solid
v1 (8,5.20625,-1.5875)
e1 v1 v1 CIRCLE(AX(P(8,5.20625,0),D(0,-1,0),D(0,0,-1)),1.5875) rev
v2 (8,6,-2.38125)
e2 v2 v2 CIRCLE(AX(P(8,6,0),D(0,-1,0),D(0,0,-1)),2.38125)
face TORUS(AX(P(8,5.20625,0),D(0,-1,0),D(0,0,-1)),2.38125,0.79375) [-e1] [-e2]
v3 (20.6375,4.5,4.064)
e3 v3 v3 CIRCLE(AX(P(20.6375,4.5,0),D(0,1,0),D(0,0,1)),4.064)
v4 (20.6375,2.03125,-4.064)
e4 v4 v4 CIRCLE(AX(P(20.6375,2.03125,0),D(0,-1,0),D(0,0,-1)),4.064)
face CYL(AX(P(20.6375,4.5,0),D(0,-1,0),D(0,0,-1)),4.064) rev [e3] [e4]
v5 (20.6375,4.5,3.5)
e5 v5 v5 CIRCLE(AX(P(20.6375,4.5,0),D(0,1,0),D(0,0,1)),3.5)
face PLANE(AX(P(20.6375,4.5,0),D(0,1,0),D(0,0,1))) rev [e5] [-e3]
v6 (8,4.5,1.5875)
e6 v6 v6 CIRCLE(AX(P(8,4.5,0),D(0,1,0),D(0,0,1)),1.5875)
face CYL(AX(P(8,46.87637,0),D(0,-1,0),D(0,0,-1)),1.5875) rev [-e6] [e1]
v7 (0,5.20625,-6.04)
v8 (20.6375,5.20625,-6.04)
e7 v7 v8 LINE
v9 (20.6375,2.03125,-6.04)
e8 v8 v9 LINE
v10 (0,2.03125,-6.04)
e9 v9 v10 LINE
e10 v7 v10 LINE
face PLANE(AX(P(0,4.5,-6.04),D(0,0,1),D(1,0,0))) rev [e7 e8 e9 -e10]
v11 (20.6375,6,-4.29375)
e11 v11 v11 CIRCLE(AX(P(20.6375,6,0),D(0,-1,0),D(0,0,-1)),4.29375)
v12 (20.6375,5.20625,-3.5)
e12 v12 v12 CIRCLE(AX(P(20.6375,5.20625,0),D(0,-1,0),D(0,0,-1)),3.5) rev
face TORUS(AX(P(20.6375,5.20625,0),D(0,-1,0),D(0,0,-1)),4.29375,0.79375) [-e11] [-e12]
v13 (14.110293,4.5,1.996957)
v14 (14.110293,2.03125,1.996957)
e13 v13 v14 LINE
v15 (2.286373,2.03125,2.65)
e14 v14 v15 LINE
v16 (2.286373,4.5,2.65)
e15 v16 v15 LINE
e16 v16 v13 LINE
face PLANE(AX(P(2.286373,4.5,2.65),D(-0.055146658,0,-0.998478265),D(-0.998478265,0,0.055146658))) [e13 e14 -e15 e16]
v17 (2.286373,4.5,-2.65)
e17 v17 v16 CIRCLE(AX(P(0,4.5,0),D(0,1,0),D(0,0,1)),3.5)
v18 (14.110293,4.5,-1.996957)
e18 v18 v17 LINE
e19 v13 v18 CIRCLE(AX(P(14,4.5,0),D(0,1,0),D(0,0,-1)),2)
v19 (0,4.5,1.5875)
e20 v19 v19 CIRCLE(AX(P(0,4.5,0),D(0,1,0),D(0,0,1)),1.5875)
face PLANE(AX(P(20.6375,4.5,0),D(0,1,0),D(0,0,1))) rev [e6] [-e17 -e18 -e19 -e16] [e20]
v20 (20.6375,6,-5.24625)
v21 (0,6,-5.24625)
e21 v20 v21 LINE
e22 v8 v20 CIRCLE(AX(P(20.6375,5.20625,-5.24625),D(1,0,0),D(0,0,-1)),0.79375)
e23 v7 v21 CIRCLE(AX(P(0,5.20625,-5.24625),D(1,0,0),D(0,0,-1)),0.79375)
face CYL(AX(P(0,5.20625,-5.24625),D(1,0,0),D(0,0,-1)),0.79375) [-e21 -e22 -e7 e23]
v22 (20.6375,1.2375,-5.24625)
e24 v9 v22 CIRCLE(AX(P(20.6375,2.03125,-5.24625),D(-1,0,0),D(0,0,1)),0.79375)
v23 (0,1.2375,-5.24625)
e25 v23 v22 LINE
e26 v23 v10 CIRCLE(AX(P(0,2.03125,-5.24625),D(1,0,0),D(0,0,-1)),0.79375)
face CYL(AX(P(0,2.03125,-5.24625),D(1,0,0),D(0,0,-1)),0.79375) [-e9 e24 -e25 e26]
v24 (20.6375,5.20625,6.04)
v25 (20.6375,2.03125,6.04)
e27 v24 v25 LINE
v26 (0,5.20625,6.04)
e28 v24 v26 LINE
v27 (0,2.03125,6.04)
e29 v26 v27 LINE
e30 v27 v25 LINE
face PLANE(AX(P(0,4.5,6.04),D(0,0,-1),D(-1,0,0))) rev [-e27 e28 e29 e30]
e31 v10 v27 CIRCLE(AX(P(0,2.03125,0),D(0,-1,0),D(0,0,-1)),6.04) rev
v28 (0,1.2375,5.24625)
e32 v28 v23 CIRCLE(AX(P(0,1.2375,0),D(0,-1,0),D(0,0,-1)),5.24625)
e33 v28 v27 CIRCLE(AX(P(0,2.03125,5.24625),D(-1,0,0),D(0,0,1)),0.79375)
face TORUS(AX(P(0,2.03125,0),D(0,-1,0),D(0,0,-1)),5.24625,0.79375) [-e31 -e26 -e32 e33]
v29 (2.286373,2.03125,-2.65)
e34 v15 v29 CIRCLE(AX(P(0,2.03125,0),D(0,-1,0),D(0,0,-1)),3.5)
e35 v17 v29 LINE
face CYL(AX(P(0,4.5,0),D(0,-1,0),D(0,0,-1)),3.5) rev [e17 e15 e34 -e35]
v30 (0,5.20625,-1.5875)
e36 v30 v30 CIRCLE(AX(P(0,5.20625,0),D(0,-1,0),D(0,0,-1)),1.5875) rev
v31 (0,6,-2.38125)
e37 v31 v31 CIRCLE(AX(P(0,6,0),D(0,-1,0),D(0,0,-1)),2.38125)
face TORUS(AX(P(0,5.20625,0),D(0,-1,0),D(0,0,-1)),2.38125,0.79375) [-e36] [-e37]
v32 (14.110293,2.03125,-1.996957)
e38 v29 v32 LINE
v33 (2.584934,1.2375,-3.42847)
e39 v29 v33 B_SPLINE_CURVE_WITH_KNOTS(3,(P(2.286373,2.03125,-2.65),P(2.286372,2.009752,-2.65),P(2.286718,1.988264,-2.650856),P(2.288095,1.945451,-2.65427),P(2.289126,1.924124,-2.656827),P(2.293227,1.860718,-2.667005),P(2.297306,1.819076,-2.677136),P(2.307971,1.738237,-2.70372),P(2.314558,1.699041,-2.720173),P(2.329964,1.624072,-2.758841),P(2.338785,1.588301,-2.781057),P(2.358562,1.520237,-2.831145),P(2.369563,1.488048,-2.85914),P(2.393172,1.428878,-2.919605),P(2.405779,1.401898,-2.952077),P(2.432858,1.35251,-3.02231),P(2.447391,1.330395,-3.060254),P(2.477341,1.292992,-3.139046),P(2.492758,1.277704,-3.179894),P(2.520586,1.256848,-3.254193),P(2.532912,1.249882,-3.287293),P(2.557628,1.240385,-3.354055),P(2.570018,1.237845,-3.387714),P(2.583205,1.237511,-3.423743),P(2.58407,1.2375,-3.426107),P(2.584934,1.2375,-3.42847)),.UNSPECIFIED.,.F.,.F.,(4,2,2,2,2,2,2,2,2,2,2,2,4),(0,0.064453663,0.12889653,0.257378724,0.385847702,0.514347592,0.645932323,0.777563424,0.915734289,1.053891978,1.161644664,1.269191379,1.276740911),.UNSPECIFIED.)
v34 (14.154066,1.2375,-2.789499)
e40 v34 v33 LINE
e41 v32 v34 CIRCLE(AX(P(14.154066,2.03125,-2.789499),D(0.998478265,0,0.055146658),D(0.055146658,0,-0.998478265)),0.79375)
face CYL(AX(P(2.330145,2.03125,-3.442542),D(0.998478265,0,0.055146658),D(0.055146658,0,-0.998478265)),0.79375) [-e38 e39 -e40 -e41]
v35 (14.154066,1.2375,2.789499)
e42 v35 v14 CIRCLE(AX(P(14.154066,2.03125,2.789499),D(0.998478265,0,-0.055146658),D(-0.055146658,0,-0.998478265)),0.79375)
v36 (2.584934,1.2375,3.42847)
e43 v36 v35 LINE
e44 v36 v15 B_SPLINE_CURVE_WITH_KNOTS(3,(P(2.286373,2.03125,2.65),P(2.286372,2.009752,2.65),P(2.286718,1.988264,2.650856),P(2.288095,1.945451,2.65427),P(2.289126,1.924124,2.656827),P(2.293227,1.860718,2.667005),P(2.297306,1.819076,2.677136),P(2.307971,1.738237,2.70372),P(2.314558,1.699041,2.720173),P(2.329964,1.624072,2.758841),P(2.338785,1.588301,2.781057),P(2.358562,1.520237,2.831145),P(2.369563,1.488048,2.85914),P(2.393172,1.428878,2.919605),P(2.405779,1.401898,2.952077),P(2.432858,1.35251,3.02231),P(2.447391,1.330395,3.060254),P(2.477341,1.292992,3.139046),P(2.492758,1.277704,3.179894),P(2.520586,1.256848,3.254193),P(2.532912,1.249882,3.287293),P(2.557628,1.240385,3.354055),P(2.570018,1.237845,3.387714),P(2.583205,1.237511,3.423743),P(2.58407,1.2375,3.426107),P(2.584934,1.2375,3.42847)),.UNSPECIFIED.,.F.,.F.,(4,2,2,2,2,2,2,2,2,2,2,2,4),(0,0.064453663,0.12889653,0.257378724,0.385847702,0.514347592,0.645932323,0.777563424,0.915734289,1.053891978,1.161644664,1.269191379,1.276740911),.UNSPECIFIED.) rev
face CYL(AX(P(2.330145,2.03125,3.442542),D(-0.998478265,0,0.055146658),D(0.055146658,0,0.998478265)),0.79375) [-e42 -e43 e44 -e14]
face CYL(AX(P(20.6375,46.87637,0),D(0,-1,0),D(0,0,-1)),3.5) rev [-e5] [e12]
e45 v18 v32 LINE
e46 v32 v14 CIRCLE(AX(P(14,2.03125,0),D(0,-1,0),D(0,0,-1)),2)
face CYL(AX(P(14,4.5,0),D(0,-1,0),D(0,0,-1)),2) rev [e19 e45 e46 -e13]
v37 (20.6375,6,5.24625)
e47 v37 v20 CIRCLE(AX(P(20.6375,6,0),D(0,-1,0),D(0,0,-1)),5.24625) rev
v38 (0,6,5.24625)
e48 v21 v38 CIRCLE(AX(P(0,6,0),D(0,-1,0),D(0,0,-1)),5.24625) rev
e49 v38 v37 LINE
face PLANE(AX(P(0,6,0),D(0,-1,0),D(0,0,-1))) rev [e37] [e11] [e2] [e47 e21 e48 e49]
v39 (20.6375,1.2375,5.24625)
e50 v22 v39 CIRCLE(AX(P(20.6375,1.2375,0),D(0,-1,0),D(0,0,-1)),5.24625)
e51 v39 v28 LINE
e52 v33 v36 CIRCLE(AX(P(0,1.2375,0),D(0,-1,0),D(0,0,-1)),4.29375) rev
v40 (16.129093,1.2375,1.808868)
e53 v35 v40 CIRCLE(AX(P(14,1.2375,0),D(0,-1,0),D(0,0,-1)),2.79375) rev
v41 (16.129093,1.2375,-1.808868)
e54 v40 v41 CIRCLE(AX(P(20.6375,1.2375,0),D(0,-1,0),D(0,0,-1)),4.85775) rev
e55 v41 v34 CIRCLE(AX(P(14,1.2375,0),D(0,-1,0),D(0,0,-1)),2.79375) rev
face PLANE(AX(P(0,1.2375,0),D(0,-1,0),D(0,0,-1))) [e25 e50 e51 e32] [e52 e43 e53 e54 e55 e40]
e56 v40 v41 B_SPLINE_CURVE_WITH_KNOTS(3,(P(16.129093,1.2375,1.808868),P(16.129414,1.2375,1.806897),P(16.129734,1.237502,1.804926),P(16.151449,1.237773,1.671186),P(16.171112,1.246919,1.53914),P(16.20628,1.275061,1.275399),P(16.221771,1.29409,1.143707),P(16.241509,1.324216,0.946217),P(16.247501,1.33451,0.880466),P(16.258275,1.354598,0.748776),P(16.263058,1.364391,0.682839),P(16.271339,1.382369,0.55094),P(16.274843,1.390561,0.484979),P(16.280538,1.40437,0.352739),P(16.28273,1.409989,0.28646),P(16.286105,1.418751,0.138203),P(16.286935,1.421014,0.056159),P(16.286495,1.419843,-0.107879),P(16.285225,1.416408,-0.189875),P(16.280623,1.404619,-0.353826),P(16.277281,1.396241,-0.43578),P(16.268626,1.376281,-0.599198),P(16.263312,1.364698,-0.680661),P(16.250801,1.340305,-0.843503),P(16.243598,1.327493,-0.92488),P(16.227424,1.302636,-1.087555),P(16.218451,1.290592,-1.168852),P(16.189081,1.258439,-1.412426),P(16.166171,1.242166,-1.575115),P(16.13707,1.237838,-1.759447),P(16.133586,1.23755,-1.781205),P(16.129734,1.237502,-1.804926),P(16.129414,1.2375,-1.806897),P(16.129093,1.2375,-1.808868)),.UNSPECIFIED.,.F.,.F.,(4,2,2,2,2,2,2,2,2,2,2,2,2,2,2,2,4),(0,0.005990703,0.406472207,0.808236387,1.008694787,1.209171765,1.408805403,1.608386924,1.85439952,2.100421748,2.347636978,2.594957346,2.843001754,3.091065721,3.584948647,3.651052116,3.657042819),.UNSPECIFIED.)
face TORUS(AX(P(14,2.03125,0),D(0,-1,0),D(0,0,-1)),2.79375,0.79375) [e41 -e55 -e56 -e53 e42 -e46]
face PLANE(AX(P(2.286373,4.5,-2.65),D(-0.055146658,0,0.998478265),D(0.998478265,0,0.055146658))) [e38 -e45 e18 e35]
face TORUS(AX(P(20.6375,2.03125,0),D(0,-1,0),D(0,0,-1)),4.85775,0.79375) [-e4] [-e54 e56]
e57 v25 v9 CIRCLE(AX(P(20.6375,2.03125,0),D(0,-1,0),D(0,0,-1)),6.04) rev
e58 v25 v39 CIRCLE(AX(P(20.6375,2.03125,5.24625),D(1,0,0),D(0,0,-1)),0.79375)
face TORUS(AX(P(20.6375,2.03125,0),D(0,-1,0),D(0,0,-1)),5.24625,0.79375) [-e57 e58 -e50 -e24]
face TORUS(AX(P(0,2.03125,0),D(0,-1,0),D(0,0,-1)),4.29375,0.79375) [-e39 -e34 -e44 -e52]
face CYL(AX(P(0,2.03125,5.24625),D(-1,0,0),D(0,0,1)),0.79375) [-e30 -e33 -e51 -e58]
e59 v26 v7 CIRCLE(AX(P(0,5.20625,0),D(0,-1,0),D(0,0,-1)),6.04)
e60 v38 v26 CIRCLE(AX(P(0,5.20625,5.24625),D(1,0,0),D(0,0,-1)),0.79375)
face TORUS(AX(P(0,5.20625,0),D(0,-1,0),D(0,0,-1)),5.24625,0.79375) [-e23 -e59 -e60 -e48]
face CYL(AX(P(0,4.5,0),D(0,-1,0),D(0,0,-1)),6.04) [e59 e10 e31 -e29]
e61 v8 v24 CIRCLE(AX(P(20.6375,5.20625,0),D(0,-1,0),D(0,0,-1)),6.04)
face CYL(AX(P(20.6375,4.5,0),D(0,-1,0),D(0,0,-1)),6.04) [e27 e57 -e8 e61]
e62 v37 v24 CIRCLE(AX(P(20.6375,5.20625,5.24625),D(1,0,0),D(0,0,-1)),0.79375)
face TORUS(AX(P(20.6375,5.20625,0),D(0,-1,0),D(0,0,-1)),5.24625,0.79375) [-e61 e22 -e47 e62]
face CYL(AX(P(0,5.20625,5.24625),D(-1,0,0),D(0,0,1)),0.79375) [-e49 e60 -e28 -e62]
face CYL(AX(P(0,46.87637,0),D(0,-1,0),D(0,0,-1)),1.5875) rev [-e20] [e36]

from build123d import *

# Parameters (mm, degrees)
SKETCH1_R           = 4.064
BOSS_EXTRUDE1_DEPTH = 4.5
SKETCH2_R           = 1.5875
SKETCH2_R_2         = 3.5
BOSS_EXTRUDE2_DEPTH = 1.5
CUT_EXTRUDE1_DEPTH  = 1.2375
FILLET2_R           = 0.79375
FILLET3_R           = 0.79375


with BuildPart() as part:
    # Sketch1 → Boss-Extrude1 (new body)
    with BuildSketch(Plane(origin=(0, 0, 0), x_dir=(1, 0, 0), z_dir=(0, 1, 0))):
        with BuildLine():
            Line((0, 6.04), (20.6375, 6.04))
            ThreePointArc((20.6375, 6.04), (26.6775, 0), (20.6375, -6.04))
            Line((20.6375, -6.04), (0, -6.04))
            ThreePointArc((0, -6.04), (-6.04, 0), (0, 6.04))
        make_face()
        with Locations(Location((20.6375, 0, 0), (0, 0, 270))):
            Circle(SKETCH1_R, mode=Mode.SUBTRACT)
        with BuildLine():
            Line((2.286372673, 2.65), (14.110293316, 1.99695653))
            ThreePointArc((14.110293316, 1.99695653), (16, 0), (14.110293316, -1.99695653))
            Line((14.110293316, -1.99695653), (2.286372673, -2.65))
            ThreePointArc((2.286372673, -2.65), (-3.5, 0), (2.286372673, 2.65))
        make_face(mode=Mode.SUBTRACT)
    extrude(amount=BOSS_EXTRUDE1_DEPTH)

    # Sketch2 → Boss-Extrude2 (add)
    with BuildSketch(Plane(origin=(0, 4.5, 0), x_dir=(1, 0, 0), z_dir=(0, 1, 0))):
        with BuildLine():
            Line((20.6375, 6.04), (0, 6.04))
            ThreePointArc((0, 6.04), (-6.04, 0), (0, -6.04))
            Line((0, -6.04), (20.6375, -6.04))
            ThreePointArc((20.6375, -6.04), (26.6775, 0), (20.6375, 6.04))
        make_face()
        with Locations(Location((0, 0, 0), (0, 0, 90))):
            Circle(SKETCH2_R, mode=Mode.SUBTRACT)
        with Locations(Location((8, 0, 0), (0, 0, 90))):
            Circle(SKETCH2_R, mode=Mode.SUBTRACT)
        with Locations(Location((20.6375, 0, 0), (0, 0, 90))):
            Circle(SKETCH2_R_2, mode=Mode.SUBTRACT)
    extrude(amount=BOSS_EXTRUDE2_DEPTH)

    # Sketch3 → Cut-Extrude1 (cut)
    with BuildSketch(Plane.XZ):
        with BuildLine():
            Line((20.6375, 6.04), (0, 6.04))
            ThreePointArc((0, 6.04), (-6.04, 0), (0, -6.04))
            Line((0, -6.04), (20.6375, -6.04))
            ThreePointArc((20.6375, -6.04), (26.6775, 0), (20.6375, 6.04))
        make_face()
    extrude(amount=-CUT_EXTRUDE1_DEPTH, mode=Mode.SUBTRACT)

    # Fillet2
    # the kernel refuses this fillet: 0.79375 mm, written as the material it takes off along each edge
    with BuildSketch(Plane(origin=(0.305017366, 1.2375, 2.75943165), x_dir=(0.055146658226504934, 0, 0.9984782652048311), z_dir=(0.9984782652048312, 0, -0.055146658226504934)), Plane(origin=(14.110293316, 1.2375, -1.99695653), x_dir=(0.055146658226504934, 0, -0.9984782652048311), z_dir=(-0.9984782652048312, 0, -0.055146658226504934))) as fillet2_piece_1:
        with BuildLine():
            CenterArc((FILLET2_R, -FILLET2_R), FILLET2_R, 90, 90)
            Line((0, -FILLET2_R), (0, 0))
            Line((0, 0), (FILLET2_R, 0))
        make_face()
    extrude(amount=13.826315937, mode=Mode.SUBTRACT)
    with BuildSketch(Plane(origin=(0, 1.2375, 0), x_dir=(0.958233566749164, 0, 0.28598676814701657), z_dir=(0.28598676814701657, 0, -0.958233566749164))) as fillet2_piece_2:
        with BuildLine():
            CenterArc((3.5 + FILLET2_R, -FILLET2_R), FILLET2_R, 90, 90)
            Line((3.5, -FILLET2_R), (3.5, 0))
            Line((3.5, 0), (3.5 + FILLET2_R, 0))
        make_face()
    revolve(axis=Axis((0, 1.2375, 0), (0, -1, 0)), revolution_arc=326.764317032, mode=Mode.SUBTRACT)
    with BuildSketch(Plane(origin=(14, 1.2375, 0), x_dir=(0.055146658226505, 0, -0.9984782652048312), z_dir=(-0.9984782652048312, 0, -0.055146658226505))) as fillet2_piece_3:
        with BuildLine():
            CenterArc((2 + FILLET2_R, -FILLET2_R), FILLET2_R, 90, 90)
            Line((2, -FILLET2_R), (2, 0))
            Line((2, 0), (2 + FILLET2_R, 0))
        make_face()
    revolve(axis=Axis((14, 1.2375, 0), (0, -1, 0)), revolution_arc=173.677451052, mode=Mode.SUBTRACT)
    with BuildSketch(Plane(origin=(20.6375, 1.2375, 0), x_dir=(0, 0, 1), z_dir=(1, 0, 0))) as fillet2_piece_4:
        with BuildLine():
            CenterArc((4.064 + FILLET2_R, -FILLET2_R), FILLET2_R, 90, 90)
            Line((4.064, -FILLET2_R), (4.064, 0))
            Line((4.064, 0), (4.064 + FILLET2_R, 0))
        make_face()
    revolve(axis=Axis((20.6375, 1.2375, 0), (0, -1, 0)), mode=Mode.SUBTRACT)
    with BuildSketch(Plane(origin=(20.6375, 1.2375, 0), x_dir=(0, 0, -1), z_dir=(-1, 0, 0))) as fillet2_piece_5:
        with BuildLine():
            CenterArc((6.04 - FILLET2_R, -FILLET2_R), FILLET2_R, 0, 90)
            Line((6.04, -FILLET2_R), (6.04, 0))
            Line((6.04, 0), (6.04 - FILLET2_R, 0))
        make_face()
    revolve(axis=Axis((20.6375, 1.2375, 0), (0, -1, 0)), revolution_arc=180, mode=Mode.SUBTRACT)
    with BuildSketch(Plane(origin=(0, 1.2375, -6.04), x_dir=(0, 0, 1), z_dir=(1, 0, 0)), Plane(origin=(20.6375, 1.2375, 6.04), x_dir=(0, 0, -1), z_dir=(-1, 0, 0))) as fillet2_piece_6:
        with BuildLine():
            CenterArc((FILLET2_R, -FILLET2_R), FILLET2_R, 90, 90)
            Line((0, -FILLET2_R), (0, 0))
            Line((0, 0), (FILLET2_R, 0))
        make_face()
    extrude(amount=20.6375, mode=Mode.SUBTRACT)
    with BuildSketch(Plane(origin=(0, 1.2375, 0), x_dir=(0, 0, 1), z_dir=(1, 0, 0))) as fillet2_piece_7:
        with BuildLine():
            CenterArc((6.04 - FILLET2_R, -FILLET2_R), FILLET2_R, 0, 90)
            Line((6.04 - FILLET2_R, 0), (6.04, 0))
            Line((6.04, 0), (6.04, -FILLET2_R))
        make_face()
    revolve(axis=Axis((0, 1.2375, 0), (0, -1, 0)), revolution_arc=180, mode=Mode.SUBTRACT)

    # Fillet3
    fillet3_edges = [part.edges().sort_by_distance(p)[0] for p in [
        (26.6775, 6, 0),
        (10.31875, 6, -6.04),
        (-6.04, 6, 0),
        (10.31875, 6, 6.04),
        (8, 6, 1.5875),
        (20.6375, 6, 3.5),
        (0, 6, 1.5875),
    ]]
    fillet(fillet3_edges, radius=FILLET3_R)


solid = part.part
